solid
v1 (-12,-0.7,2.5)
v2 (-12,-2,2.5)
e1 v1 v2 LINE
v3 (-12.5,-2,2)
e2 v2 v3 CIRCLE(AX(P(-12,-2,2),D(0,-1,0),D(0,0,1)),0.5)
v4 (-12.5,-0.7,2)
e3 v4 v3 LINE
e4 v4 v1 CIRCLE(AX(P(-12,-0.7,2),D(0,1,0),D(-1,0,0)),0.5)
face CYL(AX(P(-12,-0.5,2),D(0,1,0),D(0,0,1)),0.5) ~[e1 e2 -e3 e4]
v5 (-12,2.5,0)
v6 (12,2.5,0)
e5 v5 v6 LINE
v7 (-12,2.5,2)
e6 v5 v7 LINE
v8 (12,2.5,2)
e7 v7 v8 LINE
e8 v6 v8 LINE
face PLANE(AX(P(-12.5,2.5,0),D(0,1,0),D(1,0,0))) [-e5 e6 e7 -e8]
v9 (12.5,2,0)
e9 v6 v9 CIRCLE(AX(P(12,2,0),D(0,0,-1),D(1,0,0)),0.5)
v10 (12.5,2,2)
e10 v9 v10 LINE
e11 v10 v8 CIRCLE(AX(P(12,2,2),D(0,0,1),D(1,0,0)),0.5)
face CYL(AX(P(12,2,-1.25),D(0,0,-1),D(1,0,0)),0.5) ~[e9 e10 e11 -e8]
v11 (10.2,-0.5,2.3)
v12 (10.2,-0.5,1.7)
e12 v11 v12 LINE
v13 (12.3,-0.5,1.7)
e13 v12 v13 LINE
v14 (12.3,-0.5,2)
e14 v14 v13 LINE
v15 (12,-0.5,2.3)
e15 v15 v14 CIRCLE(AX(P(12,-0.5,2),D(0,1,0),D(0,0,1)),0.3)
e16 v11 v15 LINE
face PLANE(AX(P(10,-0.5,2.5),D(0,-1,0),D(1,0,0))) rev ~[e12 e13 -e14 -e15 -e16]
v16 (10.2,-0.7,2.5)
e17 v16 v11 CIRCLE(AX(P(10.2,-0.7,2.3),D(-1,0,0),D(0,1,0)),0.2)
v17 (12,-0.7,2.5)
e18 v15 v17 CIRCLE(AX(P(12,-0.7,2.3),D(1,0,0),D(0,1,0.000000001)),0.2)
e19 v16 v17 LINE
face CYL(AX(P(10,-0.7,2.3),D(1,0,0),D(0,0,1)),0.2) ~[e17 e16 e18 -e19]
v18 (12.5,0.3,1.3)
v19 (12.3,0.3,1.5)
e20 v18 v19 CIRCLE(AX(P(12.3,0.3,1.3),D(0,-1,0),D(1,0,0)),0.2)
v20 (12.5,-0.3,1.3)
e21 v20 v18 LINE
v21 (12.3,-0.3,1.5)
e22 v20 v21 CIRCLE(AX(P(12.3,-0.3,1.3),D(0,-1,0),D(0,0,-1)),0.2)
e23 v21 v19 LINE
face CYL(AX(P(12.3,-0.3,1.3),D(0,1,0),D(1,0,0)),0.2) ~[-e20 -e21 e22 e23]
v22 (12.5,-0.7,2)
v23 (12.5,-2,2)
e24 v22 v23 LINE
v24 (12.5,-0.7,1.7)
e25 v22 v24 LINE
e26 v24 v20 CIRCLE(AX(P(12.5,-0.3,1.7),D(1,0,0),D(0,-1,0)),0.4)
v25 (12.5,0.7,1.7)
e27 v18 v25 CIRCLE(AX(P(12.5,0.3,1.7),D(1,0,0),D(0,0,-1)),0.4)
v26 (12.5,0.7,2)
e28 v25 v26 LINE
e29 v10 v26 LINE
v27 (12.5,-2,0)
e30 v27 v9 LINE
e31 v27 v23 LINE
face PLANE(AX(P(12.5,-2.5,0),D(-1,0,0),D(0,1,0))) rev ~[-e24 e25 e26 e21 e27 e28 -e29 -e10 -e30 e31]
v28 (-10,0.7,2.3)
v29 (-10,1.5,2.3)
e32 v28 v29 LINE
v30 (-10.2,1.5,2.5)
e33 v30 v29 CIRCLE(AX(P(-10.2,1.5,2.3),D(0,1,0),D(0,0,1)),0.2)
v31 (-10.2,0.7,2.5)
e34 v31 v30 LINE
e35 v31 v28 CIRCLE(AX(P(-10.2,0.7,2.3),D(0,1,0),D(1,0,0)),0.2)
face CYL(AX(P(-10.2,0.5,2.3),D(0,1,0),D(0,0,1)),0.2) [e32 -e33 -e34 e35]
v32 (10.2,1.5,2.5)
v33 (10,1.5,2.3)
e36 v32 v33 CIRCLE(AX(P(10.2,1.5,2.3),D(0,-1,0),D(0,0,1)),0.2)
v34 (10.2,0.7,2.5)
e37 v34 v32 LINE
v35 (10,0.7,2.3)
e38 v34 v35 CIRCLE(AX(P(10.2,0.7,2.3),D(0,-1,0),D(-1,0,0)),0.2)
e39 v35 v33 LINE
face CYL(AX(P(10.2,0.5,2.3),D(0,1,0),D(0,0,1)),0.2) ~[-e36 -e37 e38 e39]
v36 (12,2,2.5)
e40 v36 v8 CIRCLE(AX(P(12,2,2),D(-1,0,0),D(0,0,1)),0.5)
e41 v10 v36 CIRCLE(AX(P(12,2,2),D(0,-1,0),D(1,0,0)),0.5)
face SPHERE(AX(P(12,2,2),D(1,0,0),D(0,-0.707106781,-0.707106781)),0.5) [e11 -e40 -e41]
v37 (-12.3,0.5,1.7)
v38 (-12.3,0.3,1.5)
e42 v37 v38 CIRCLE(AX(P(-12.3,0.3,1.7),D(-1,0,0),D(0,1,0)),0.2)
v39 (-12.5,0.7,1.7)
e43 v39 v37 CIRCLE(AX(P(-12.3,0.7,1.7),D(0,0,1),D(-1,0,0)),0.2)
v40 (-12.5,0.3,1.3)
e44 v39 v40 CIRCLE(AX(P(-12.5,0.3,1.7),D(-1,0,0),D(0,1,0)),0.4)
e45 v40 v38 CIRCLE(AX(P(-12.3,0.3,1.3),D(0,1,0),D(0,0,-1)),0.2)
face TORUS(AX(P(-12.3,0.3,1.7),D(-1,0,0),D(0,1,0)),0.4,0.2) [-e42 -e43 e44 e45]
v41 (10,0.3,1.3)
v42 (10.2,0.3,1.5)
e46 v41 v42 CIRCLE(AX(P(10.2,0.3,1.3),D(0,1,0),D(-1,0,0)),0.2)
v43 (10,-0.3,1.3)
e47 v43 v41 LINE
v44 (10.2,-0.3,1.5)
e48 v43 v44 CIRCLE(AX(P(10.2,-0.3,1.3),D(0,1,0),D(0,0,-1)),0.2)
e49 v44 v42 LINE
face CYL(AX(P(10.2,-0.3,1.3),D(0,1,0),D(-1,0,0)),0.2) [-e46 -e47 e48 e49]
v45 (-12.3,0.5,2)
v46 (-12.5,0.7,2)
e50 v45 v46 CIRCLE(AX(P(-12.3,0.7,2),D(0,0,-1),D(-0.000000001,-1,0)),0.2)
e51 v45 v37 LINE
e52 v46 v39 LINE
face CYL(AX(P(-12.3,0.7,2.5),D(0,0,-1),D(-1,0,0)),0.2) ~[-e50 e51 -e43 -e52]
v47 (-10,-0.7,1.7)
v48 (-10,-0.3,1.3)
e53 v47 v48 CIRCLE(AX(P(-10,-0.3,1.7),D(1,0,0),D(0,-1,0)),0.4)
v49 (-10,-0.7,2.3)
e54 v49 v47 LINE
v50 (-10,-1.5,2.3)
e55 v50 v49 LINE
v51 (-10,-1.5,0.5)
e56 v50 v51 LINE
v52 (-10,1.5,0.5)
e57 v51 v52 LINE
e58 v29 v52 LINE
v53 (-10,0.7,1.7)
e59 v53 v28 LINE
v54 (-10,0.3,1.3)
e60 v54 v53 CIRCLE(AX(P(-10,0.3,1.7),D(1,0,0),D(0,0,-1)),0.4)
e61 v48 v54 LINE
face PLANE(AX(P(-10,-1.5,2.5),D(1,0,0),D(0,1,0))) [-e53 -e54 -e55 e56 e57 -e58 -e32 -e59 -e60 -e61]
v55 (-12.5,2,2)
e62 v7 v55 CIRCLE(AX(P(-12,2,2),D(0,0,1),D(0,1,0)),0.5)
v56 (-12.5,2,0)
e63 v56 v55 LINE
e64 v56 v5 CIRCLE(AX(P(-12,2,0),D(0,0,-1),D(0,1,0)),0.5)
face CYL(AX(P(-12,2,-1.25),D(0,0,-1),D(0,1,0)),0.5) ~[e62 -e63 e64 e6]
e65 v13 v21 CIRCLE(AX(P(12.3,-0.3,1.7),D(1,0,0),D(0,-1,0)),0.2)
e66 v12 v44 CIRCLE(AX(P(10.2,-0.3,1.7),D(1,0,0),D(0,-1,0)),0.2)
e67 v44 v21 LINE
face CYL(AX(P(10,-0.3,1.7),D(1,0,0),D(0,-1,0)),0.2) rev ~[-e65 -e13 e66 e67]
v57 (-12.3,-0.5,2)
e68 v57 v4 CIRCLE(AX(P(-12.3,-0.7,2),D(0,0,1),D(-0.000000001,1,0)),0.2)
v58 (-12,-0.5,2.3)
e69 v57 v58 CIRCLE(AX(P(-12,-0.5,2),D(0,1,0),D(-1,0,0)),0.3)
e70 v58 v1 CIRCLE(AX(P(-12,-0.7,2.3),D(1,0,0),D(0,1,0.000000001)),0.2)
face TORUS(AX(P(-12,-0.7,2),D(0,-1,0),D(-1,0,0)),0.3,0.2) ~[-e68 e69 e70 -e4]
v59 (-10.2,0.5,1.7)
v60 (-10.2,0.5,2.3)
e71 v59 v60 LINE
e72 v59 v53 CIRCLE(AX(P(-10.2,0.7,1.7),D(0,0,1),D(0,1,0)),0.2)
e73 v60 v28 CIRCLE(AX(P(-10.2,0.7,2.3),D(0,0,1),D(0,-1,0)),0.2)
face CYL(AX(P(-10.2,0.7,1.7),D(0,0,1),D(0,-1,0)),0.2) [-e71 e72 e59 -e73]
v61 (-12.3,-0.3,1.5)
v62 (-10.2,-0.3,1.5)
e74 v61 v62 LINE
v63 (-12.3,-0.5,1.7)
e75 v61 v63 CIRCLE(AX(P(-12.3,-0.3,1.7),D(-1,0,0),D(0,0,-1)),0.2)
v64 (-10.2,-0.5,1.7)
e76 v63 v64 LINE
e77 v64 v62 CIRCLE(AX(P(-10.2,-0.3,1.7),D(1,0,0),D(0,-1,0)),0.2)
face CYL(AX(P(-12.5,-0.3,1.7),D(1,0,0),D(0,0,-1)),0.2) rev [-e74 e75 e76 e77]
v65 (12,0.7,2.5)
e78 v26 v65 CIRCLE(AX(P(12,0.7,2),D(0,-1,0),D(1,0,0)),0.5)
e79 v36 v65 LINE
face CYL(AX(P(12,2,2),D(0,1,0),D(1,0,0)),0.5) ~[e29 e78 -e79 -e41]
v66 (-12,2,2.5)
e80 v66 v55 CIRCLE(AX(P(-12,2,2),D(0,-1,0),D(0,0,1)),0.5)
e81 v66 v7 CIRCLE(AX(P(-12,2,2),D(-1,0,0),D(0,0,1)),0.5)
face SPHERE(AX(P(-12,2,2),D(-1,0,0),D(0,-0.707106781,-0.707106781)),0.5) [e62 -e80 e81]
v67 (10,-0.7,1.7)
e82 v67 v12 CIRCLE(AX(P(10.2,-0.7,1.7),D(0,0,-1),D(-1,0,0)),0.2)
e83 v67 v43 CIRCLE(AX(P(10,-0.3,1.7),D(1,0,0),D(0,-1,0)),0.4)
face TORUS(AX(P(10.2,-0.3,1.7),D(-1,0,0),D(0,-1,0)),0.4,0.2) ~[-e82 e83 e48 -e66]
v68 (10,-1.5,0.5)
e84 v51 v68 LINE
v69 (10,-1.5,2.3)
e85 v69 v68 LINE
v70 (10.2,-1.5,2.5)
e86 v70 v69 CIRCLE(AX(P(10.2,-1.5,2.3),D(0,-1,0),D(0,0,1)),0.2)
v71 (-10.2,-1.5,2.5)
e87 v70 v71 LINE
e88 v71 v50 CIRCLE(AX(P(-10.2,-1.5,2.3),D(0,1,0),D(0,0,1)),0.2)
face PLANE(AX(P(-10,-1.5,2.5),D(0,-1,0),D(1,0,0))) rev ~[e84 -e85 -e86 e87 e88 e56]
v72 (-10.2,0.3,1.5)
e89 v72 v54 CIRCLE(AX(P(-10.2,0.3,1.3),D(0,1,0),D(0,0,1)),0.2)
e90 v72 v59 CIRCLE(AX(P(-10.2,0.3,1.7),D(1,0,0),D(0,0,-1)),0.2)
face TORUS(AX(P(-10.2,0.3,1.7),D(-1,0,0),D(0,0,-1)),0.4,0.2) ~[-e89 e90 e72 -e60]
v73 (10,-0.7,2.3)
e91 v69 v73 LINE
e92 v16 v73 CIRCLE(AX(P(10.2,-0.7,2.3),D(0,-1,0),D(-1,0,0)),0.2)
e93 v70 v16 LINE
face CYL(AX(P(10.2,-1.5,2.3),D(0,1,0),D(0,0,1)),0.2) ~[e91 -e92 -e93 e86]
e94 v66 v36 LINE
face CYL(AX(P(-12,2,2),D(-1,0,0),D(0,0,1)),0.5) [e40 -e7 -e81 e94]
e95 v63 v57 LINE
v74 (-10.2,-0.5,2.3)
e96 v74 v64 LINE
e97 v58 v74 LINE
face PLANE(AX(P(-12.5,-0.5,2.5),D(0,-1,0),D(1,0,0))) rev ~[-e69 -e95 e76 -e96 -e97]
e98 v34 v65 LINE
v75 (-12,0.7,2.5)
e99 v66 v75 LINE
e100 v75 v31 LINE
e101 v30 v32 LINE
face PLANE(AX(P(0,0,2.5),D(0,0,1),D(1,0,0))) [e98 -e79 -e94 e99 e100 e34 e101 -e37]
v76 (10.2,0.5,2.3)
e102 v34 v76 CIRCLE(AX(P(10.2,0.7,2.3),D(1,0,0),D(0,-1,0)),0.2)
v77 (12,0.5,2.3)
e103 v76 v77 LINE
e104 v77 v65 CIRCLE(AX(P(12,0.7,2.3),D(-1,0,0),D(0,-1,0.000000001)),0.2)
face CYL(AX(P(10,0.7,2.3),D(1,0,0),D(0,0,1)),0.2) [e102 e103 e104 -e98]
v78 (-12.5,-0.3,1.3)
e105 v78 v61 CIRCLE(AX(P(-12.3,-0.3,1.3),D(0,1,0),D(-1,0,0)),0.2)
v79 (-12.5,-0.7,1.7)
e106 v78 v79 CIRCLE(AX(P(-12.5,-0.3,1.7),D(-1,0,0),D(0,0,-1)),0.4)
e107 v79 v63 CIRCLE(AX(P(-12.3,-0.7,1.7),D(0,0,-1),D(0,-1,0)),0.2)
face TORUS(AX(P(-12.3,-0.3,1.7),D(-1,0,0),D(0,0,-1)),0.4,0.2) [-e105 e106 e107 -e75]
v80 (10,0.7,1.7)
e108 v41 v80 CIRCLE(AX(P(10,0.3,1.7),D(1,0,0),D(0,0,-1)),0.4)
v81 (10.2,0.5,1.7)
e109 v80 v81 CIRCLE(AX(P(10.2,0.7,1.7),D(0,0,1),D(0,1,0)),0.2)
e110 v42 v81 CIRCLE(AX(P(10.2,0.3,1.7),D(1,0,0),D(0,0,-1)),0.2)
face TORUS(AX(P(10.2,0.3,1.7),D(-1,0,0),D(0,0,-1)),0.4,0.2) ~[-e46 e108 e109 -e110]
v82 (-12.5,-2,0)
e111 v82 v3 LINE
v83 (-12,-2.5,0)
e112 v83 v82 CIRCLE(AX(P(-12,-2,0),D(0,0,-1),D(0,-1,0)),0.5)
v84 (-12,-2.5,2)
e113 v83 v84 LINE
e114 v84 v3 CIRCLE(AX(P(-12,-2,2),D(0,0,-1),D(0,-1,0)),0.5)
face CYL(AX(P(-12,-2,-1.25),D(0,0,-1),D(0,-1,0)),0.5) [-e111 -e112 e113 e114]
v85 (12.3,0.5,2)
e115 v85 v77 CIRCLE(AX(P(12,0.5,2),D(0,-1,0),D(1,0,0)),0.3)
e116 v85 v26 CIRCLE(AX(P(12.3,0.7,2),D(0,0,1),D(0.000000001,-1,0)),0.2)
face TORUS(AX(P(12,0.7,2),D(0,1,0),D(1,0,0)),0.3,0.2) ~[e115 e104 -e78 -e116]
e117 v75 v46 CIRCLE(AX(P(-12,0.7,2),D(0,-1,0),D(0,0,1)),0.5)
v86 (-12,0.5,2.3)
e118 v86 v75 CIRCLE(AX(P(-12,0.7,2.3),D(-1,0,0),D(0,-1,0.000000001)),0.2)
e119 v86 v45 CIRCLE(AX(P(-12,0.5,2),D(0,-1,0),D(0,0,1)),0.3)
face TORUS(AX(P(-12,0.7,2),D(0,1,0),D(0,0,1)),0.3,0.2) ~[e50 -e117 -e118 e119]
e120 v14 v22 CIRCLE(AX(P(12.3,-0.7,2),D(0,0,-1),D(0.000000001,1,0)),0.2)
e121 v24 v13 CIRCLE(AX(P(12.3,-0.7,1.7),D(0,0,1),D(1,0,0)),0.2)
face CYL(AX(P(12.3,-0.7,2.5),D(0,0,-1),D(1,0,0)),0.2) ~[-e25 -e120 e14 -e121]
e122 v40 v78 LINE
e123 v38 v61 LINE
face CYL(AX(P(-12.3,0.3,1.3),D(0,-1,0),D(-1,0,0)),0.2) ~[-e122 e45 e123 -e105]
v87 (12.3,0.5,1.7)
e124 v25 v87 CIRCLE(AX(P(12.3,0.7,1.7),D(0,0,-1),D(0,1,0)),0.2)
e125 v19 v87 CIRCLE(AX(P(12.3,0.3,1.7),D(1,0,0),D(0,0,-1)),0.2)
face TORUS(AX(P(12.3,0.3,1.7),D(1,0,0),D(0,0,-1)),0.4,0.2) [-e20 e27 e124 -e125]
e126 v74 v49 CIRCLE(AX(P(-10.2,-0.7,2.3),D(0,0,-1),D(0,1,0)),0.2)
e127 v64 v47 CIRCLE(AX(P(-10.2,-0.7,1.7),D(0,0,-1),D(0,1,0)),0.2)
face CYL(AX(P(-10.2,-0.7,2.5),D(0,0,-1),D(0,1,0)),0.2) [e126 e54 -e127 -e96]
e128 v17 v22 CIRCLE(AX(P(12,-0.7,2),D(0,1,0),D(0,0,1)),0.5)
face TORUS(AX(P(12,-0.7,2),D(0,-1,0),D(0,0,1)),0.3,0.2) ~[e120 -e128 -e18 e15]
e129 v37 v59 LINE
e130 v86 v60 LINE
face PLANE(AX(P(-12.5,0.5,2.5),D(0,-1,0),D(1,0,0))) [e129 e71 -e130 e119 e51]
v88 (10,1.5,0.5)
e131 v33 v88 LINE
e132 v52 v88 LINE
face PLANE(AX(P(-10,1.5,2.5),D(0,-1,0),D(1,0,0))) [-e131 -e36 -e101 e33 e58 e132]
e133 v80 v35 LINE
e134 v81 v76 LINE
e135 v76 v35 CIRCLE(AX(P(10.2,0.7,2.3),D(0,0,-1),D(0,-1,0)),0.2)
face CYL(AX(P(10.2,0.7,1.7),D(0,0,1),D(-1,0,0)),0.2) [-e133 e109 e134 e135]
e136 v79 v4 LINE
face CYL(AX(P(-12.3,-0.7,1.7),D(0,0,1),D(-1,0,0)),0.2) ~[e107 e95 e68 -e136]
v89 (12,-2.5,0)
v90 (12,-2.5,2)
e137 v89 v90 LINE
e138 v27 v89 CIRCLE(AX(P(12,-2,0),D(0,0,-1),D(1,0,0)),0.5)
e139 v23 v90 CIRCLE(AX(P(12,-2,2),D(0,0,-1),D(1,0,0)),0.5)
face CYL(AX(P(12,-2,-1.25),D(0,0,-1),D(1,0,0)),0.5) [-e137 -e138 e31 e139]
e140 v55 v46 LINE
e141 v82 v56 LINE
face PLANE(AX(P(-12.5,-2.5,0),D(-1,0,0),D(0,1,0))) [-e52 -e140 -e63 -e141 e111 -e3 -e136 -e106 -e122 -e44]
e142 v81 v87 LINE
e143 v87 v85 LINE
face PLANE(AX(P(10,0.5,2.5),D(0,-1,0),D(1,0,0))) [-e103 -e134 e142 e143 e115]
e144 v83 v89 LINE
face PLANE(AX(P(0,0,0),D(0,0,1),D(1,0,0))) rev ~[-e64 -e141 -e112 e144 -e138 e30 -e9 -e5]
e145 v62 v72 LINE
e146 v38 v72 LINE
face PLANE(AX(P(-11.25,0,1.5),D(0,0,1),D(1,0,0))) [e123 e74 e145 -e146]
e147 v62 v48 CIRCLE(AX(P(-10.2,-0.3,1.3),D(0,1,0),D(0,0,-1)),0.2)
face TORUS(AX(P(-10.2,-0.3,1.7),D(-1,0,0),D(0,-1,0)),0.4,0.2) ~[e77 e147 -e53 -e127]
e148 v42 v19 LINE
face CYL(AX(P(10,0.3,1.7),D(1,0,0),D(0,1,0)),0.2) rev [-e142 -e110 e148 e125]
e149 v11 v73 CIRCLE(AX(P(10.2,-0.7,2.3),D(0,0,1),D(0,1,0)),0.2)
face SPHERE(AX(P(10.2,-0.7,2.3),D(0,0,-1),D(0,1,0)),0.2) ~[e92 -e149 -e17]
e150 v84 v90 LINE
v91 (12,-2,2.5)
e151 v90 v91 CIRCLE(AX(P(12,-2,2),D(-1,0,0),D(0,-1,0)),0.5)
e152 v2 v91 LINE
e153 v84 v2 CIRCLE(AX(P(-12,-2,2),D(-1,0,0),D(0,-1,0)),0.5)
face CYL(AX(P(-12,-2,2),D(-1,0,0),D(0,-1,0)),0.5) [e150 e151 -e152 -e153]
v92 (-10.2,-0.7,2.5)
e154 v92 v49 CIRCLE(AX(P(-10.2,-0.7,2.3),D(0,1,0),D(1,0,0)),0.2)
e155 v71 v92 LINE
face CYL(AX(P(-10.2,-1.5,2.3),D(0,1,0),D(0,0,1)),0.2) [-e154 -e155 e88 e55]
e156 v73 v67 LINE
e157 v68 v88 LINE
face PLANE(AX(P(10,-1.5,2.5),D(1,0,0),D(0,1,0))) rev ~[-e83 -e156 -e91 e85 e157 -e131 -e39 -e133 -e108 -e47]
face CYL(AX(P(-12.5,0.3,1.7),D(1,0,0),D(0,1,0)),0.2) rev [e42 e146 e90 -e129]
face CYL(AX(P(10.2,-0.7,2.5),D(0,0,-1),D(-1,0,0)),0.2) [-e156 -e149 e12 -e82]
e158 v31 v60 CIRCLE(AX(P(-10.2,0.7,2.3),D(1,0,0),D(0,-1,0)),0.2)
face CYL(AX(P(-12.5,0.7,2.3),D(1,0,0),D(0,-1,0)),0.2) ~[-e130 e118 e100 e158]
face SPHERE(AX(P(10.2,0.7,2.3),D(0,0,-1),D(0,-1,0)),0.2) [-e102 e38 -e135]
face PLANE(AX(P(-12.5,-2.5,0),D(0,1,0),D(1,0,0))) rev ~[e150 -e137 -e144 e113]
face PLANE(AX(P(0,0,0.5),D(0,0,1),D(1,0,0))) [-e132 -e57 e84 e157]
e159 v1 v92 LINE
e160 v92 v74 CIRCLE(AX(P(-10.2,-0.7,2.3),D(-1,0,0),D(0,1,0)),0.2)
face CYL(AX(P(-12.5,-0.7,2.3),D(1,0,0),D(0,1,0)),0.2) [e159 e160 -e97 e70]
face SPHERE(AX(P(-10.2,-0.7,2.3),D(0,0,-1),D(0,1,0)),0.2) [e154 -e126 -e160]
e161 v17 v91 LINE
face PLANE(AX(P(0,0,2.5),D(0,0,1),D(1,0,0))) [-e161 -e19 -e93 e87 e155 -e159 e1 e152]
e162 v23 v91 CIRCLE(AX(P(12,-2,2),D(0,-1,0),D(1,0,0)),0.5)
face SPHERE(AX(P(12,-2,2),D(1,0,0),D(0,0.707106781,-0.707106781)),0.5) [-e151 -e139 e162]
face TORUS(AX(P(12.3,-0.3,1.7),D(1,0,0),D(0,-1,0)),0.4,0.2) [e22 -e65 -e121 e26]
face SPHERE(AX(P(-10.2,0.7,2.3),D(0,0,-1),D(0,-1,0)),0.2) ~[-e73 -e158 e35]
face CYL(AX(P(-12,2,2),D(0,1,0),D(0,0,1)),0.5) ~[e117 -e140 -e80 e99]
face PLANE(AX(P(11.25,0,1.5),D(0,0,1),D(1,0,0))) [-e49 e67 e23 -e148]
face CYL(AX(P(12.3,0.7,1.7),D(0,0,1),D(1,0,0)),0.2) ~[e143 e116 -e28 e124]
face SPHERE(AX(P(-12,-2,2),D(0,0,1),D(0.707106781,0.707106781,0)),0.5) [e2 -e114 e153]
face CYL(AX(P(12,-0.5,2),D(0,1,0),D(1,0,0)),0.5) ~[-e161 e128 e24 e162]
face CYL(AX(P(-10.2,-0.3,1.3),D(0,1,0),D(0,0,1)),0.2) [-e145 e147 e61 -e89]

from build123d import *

# Parameters (mm, degrees)
F0_W         = 25
F0_H         = 5
F1_DEPTH     = 2.5
F2_W         = 20
F2_H         = 3
F3_DEPTH     = 2
F4_W         = 2.5
F4_H         = 1
F5_DEPTH     = 1
F6_F1_R      = 0.2
F6_F2_R      = 0.2
F7_T1_DEPTH  = 24
F7_T3_DEPTH  = 1.5
F7_T5_DEPTH  = 3.25
F7_T7_DEPTH  = 1.5
F7_T10_ANGLE = 90
F7_T12_ANGLE = 90
F7_T14_ANGLE = 90
F7_T16_ANGLE = 90
F7_S19_W     = 0.5
F7_S19_H     = 0.5
F7_T20_DEPTH = 0.5
F7_S25_W     = 0.5
F7_S25_H     = 0.5
F7_T26_DEPTH = 0.5
F7_S31_W     = 0.5
F7_S31_H     = 0.5
F7_T32_DEPTH = 0.5
F7_S37_W     = 0.5
F7_S37_H     = 0.5
F7_T38_DEPTH = 0.5


# Not quite as in the source:
# - a fillet or chamfer that OpenCascade refuses, or shapes differently, is made with other operations: its cross-section is extruded or revolved along the edge and cut away or added


with BuildPart() as f1:
    # F0 (on Top) → F1 (new body)
    with BuildSketch(Plane.XY):
        Rectangle(F0_W, F0_H)
    extrude(amount=F1_DEPTH)

    # F2 (on face) → F3 (cut)
    with BuildSketch(Plane.XY.offset(2.5)):
        Rectangle(F2_W, F2_H)
    extrude(amount=-F3_DEPTH, mode=Mode.SUBTRACT)

    # F4 (on face) → F5 (cut)
    with BuildSketch(Plane.XY.offset(2.5)):
        with Locations((-11.25, 0)):
            Rectangle(F4_W, F4_H)
        with Locations((11.25, 0)):
            Rectangle(F4_W, F4_H)
    extrude(amount=-F5_DEPTH, mode=Mode.SUBTRACT)

    # F6: fillet of radius 0.2 on 16 edges, made by hand

    # F6_f1
    f6_f1_edges = [f1.edges().sort_by_distance(p)[0] for p in [
        (-11.25, -0.5, 1.5),
        (-11.25, 0.5, 1.5),
        (11.25, -0.5, 1.5),
        (11.25, 0.5, 1.5),
    ]]
    fillet(f6_f1_edges, radius=F6_F1_R)

    # F6_f2
    f6_f2_edges = [f1.edges().sort_by_distance(p)[0] for p in [
        (-10, -0.5, 2.1),
        (10, 0, 1.5),
        (12.5, -0.5, 2.1),
        (-12.5, 0.5, 2.1),
        (-11.25, 0.5, 2.5),
        (-11.25, -0.5, 2.5),
        (11.25, 0.5, 2.5),
        (11.25, -0.5, 2.5),
        (-10, 1, 2.5),
        (10, 1, 2.5),
        (10, -1, 2.5),
        (-10, -1, 2.5),
        (-12.5, 0.4414213562, 1.5585786438),
        (12.5, -0.4414213562, 1.5585786438),
        (10, 0.4414213562, 1.5585786438),
        (10, -0.4414213562, 1.5585786438),
        (-10, -0.4414213562, 1.5585786438),
    ]]
    fillet(f6_f2_edges, radius=F6_F2_R)

    # F7: fillet of radius 0.5 on 10 edges, made by hand

    # F7_s2 → F7_t1 (cut)
    with BuildSketch(Plane.YZ.offset(-12)):
        with BuildLine():
            ThreePointArc((-2.5, 2), (-2.3535533906, 2.3535533906), (-2, 2.5))
            Line((-2, 2.5), (-2.5, 2.5))
            Line((-2.5, 2.5), (-2.5, 2))
        make_face()
        with BuildLine():
            ThreePointArc((2, 2.5), (2.3535533906, 2.3535533906), (2.5, 2))
            Line((2.5, 2), (2.5, 2.5))
            Line((2.5, 2.5), (2, 2.5))
        make_face()
    extrude(amount=F7_T1_DEPTH, mode=Mode.SUBTRACT)

    # F7_s4 → F7_t3 (cut)
    with BuildSketch(Plane.XZ.offset(0.5)):
        with BuildLine():
            ThreePointArc((-12, 2.5), (-12.3535533906, 2.3535533906), (-12.5, 2))
            Line((-12.5, 2), (-12.5, 2.5))
            Line((-12.5, 2.5), (-12, 2.5))
        make_face()
        with BuildLine():
            ThreePointArc((12.5, 2), (12.3535533906, 2.3535533906), (12, 2.5))
            Line((12, 2.5), (12.5, 2.5))
            Line((12.5, 2.5), (12.5, 2))
        make_face()
    extrude(amount=F7_T3_DEPTH, mode=Mode.SUBTRACT)

    # F7_s6 → F7_t5 (cut)
    with BuildSketch(Plane.XY.offset(-1.25)):
        with BuildLine():
            ThreePointArc((-12, -2.5), (-12.3535533906, -2.3535533906), (-12.5, -2))
            Line((-12.5, -2), (-12.5, -2.5))
            Line((-12.5, -2.5), (-12, -2.5))
        make_face()
        with BuildLine():
            ThreePointArc((12.5, -2), (12.3535533906, -2.3535533906), (12, -2.5))
            Line((12, -2.5), (12.5, -2.5))
            Line((12.5, -2.5), (12.5, -2))
        make_face()
        with BuildLine():
            ThreePointArc((-12, 2.5), (-12.3535533906, 2.3535533906), (-12.5, 2))
            Line((-12.5, 2), (-12.5, 2.5))
            Line((-12.5, 2.5), (-12, 2.5))
        make_face()
        with BuildLine():
            ThreePointArc((12.5, 2), (12.3535533906, 2.3535533906), (12, 2.5))
            Line((12, 2.5), (12.5, 2.5))
            Line((12.5, 2.5), (12.5, 2))
        make_face()
    extrude(amount=F7_T5_DEPTH, mode=Mode.SUBTRACT)

    # F7_s8 → F7_t7 (cut)
    with BuildSketch(Plane.XZ.offset(-2)):
        with BuildLine():
            ThreePointArc((-12, 2.5), (-12.3535533906, 2.3535533906), (-12.5, 2))
            Line((-12.5, 2), (-12.5, 2.5))
            Line((-12.5, 2.5), (-12, 2.5))
        make_face()
        with BuildLine():
            ThreePointArc((12.5, 2), (12.3535533906, 2.3535533906), (12, 2.5))
            Line((12, 2.5), (12.5, 2.5))
            Line((12.5, 2.5), (12.5, 2))
        make_face()
    extrude(amount=F7_T7_DEPTH, mode=Mode.SUBTRACT)

    # F7_s9 → F7_t10 (revolve, cut)
    with BuildSketch(Plane.XY.offset(2)):
        with BuildLine():
            ThreePointArc((12.3, 0.5), (12.4414213562, 0.5585786438), (12.5, 0.7))
            Line((12.5, 0.7), (12.5, 0.5))
            Line((12.5, 0.5), (12.3, 0.5))
        make_face()
    revolve(axis=Axis((12, 0.5, 2), (0, -1, 0)), revolution_arc=F7_T10_ANGLE, mode=Mode.SUBTRACT)

    # F7_s11 → F7_t12 (revolve, cut)
    with BuildSketch(Plane.YZ.offset(-12)):
        with BuildLine():
            ThreePointArc((0.5, 2.3), (0.5585786438, 2.4414213562), (0.7, 2.5))
            Line((0.7, 2.5), (0.5, 2.5))
            Line((0.5, 2.5), (0.5, 2.3))
        make_face()
    revolve(axis=Axis((-12, 0.5, 2), (0, -1, 0)), revolution_arc=F7_T12_ANGLE, mode=Mode.SUBTRACT)

    # F7_s13 → F7_t14 (revolve, cut)
    with BuildSketch(Plane.YZ.offset(12)):
        with BuildLine():
            ThreePointArc((-0.5, 2.3), (-0.5585786438, 2.4414213562), (-0.7, 2.5))
            Line((-0.7, 2.5), (-0.5, 2.5))
            Line((-0.5, 2.5), (-0.5, 2.3))
        make_face()
    revolve(axis=Axis((12, -0.5, 2), (0, 1, 0)), revolution_arc=F7_T14_ANGLE, mode=Mode.SUBTRACT)

    # F7_s15 → F7_t16 (revolve, cut)
    with BuildSketch(Plane.XY.offset(2)):
        with BuildLine():
            ThreePointArc((-12.3, -0.5), (-12.4414213562, -0.5585786438), (-12.5, -0.7))
            Line((-12.5, -0.7), (-12.5, -0.5))
            Line((-12.5, -0.5), (-12.3, -0.5))
        make_face()
    revolve(axis=Axis((-12, -0.5, 2), (0, 1, 0)), revolution_arc=F7_T16_ANGLE, mode=Mode.SUBTRACT)


with BuildPart() as f7_tool18:
    # F7_s19 → F7_t20 (new body)
    with BuildSketch(Plane.XY.offset(2)):
        with Locations((-12.25, -2.25)):
            Rectangle(F7_S19_W, F7_S19_H)
    extrude(amount=F7_T20_DEPTH)

    # F7_s21 → F7_t22 (revolve, cut)
    with BuildSketch(Plane(origin=(-12, -2, 2), x_dir=(0.7071067812, 0.7071067812, 0), z_dir=(0.7071067812, -0.7071067812, 0))):
        with BuildLine():
            ThreePointArc((0, -0.5), (0.5, 0), (0, 0.5))
            Line((0, 0.5), (0, -0.5))
        make_face()
    revolve(axis=Axis((-12, -2, 2), (0, 0, 1)), mode=Mode.SUBTRACT)


with BuildPart() as f1_1:
    add(f1.part)

    # F7_t17: cut F7_tool18
    add(f7_tool18.part, mode=Mode.SUBTRACT)


with BuildPart() as f7_tool24:
    # F7_s25 → F7_t26 (new body)
    with BuildSketch(Plane.YZ.offset(12)):
        with Locations((-2.25, 2.25)):
            Rectangle(F7_S25_W, F7_S25_H)
    extrude(amount=F7_T26_DEPTH)

    # F7_s27 → F7_t28 (revolve, cut)
    with BuildSketch(Plane(origin=(12, -2, 2), x_dir=(0, 0.7071067812, -0.7071067812), z_dir=(0, -0.7071067812, -0.7071067812))):
        with BuildLine():
            ThreePointArc((0, -0.5), (0.5, 0), (0, 0.5))
            Line((0, 0.5), (0, -0.5))
        make_face()
    revolve(axis=Axis((12, -2, 2), (1, 0, 0)), mode=Mode.SUBTRACT)


with BuildPart() as f1_2:
    add(f1_1.part)

    # F7_t23: cut F7_tool24
    add(f7_tool24.part, mode=Mode.SUBTRACT)


with BuildPart() as f7_tool30:
    # F7_s31 → F7_t32 (new body)
    with BuildSketch(Plane.YZ.offset(12)):
        with Locations((2.25, 2.25)):
            Rectangle(F7_S31_W, F7_S31_H)
    extrude(amount=F7_T32_DEPTH)

    # F7_s33 → F7_t34 (revolve, cut)
    with BuildSketch(Plane(origin=(12, 2, 2), x_dir=(0, -0.7071067812, -0.7071067812), z_dir=(0, -0.7071067812, 0.7071067812))):
        with BuildLine():
            ThreePointArc((0, -0.5), (0.5, 0), (0, 0.5))
            Line((0, 0.5), (0, -0.5))
        make_face()
    revolve(axis=Axis((12, 2, 2), (1, 0, 0)), mode=Mode.SUBTRACT)


with BuildPart() as f1_3:
    add(f1_2.part)

    # F7_t29: cut F7_tool30
    add(f7_tool30.part, mode=Mode.SUBTRACT)


with BuildPart() as f7_tool36:
    # F7_s37 → F7_t38 (new body)
    with BuildSketch(Plane.YZ.offset(-12)):
        with Locations((2.25, 2.25)):
            Rectangle(F7_S37_W, F7_S37_H)
    extrude(amount=-F7_T38_DEPTH)

    # F7_s39 → F7_t40 (revolve, cut)
    with BuildSketch(Plane(origin=(-12, 2, 2), x_dir=(0, -0.7071067812, -0.7071067812), z_dir=(0, 0.7071067812, -0.7071067812))):
        with BuildLine():
            ThreePointArc((0, -0.5), (0.5, 0), (0, 0.5))
            Line((0, 0.5), (0, -0.5))
        make_face()
    revolve(axis=Axis((-12, 2, 2), (-1, 0, 0)), mode=Mode.SUBTRACT)


with BuildPart() as f1_4:
    add(f1_3.part)

    # F7_t35: cut F7_tool36
    add(f7_tool36.part, mode=Mode.SUBTRACT)


solid = f1_4.part
